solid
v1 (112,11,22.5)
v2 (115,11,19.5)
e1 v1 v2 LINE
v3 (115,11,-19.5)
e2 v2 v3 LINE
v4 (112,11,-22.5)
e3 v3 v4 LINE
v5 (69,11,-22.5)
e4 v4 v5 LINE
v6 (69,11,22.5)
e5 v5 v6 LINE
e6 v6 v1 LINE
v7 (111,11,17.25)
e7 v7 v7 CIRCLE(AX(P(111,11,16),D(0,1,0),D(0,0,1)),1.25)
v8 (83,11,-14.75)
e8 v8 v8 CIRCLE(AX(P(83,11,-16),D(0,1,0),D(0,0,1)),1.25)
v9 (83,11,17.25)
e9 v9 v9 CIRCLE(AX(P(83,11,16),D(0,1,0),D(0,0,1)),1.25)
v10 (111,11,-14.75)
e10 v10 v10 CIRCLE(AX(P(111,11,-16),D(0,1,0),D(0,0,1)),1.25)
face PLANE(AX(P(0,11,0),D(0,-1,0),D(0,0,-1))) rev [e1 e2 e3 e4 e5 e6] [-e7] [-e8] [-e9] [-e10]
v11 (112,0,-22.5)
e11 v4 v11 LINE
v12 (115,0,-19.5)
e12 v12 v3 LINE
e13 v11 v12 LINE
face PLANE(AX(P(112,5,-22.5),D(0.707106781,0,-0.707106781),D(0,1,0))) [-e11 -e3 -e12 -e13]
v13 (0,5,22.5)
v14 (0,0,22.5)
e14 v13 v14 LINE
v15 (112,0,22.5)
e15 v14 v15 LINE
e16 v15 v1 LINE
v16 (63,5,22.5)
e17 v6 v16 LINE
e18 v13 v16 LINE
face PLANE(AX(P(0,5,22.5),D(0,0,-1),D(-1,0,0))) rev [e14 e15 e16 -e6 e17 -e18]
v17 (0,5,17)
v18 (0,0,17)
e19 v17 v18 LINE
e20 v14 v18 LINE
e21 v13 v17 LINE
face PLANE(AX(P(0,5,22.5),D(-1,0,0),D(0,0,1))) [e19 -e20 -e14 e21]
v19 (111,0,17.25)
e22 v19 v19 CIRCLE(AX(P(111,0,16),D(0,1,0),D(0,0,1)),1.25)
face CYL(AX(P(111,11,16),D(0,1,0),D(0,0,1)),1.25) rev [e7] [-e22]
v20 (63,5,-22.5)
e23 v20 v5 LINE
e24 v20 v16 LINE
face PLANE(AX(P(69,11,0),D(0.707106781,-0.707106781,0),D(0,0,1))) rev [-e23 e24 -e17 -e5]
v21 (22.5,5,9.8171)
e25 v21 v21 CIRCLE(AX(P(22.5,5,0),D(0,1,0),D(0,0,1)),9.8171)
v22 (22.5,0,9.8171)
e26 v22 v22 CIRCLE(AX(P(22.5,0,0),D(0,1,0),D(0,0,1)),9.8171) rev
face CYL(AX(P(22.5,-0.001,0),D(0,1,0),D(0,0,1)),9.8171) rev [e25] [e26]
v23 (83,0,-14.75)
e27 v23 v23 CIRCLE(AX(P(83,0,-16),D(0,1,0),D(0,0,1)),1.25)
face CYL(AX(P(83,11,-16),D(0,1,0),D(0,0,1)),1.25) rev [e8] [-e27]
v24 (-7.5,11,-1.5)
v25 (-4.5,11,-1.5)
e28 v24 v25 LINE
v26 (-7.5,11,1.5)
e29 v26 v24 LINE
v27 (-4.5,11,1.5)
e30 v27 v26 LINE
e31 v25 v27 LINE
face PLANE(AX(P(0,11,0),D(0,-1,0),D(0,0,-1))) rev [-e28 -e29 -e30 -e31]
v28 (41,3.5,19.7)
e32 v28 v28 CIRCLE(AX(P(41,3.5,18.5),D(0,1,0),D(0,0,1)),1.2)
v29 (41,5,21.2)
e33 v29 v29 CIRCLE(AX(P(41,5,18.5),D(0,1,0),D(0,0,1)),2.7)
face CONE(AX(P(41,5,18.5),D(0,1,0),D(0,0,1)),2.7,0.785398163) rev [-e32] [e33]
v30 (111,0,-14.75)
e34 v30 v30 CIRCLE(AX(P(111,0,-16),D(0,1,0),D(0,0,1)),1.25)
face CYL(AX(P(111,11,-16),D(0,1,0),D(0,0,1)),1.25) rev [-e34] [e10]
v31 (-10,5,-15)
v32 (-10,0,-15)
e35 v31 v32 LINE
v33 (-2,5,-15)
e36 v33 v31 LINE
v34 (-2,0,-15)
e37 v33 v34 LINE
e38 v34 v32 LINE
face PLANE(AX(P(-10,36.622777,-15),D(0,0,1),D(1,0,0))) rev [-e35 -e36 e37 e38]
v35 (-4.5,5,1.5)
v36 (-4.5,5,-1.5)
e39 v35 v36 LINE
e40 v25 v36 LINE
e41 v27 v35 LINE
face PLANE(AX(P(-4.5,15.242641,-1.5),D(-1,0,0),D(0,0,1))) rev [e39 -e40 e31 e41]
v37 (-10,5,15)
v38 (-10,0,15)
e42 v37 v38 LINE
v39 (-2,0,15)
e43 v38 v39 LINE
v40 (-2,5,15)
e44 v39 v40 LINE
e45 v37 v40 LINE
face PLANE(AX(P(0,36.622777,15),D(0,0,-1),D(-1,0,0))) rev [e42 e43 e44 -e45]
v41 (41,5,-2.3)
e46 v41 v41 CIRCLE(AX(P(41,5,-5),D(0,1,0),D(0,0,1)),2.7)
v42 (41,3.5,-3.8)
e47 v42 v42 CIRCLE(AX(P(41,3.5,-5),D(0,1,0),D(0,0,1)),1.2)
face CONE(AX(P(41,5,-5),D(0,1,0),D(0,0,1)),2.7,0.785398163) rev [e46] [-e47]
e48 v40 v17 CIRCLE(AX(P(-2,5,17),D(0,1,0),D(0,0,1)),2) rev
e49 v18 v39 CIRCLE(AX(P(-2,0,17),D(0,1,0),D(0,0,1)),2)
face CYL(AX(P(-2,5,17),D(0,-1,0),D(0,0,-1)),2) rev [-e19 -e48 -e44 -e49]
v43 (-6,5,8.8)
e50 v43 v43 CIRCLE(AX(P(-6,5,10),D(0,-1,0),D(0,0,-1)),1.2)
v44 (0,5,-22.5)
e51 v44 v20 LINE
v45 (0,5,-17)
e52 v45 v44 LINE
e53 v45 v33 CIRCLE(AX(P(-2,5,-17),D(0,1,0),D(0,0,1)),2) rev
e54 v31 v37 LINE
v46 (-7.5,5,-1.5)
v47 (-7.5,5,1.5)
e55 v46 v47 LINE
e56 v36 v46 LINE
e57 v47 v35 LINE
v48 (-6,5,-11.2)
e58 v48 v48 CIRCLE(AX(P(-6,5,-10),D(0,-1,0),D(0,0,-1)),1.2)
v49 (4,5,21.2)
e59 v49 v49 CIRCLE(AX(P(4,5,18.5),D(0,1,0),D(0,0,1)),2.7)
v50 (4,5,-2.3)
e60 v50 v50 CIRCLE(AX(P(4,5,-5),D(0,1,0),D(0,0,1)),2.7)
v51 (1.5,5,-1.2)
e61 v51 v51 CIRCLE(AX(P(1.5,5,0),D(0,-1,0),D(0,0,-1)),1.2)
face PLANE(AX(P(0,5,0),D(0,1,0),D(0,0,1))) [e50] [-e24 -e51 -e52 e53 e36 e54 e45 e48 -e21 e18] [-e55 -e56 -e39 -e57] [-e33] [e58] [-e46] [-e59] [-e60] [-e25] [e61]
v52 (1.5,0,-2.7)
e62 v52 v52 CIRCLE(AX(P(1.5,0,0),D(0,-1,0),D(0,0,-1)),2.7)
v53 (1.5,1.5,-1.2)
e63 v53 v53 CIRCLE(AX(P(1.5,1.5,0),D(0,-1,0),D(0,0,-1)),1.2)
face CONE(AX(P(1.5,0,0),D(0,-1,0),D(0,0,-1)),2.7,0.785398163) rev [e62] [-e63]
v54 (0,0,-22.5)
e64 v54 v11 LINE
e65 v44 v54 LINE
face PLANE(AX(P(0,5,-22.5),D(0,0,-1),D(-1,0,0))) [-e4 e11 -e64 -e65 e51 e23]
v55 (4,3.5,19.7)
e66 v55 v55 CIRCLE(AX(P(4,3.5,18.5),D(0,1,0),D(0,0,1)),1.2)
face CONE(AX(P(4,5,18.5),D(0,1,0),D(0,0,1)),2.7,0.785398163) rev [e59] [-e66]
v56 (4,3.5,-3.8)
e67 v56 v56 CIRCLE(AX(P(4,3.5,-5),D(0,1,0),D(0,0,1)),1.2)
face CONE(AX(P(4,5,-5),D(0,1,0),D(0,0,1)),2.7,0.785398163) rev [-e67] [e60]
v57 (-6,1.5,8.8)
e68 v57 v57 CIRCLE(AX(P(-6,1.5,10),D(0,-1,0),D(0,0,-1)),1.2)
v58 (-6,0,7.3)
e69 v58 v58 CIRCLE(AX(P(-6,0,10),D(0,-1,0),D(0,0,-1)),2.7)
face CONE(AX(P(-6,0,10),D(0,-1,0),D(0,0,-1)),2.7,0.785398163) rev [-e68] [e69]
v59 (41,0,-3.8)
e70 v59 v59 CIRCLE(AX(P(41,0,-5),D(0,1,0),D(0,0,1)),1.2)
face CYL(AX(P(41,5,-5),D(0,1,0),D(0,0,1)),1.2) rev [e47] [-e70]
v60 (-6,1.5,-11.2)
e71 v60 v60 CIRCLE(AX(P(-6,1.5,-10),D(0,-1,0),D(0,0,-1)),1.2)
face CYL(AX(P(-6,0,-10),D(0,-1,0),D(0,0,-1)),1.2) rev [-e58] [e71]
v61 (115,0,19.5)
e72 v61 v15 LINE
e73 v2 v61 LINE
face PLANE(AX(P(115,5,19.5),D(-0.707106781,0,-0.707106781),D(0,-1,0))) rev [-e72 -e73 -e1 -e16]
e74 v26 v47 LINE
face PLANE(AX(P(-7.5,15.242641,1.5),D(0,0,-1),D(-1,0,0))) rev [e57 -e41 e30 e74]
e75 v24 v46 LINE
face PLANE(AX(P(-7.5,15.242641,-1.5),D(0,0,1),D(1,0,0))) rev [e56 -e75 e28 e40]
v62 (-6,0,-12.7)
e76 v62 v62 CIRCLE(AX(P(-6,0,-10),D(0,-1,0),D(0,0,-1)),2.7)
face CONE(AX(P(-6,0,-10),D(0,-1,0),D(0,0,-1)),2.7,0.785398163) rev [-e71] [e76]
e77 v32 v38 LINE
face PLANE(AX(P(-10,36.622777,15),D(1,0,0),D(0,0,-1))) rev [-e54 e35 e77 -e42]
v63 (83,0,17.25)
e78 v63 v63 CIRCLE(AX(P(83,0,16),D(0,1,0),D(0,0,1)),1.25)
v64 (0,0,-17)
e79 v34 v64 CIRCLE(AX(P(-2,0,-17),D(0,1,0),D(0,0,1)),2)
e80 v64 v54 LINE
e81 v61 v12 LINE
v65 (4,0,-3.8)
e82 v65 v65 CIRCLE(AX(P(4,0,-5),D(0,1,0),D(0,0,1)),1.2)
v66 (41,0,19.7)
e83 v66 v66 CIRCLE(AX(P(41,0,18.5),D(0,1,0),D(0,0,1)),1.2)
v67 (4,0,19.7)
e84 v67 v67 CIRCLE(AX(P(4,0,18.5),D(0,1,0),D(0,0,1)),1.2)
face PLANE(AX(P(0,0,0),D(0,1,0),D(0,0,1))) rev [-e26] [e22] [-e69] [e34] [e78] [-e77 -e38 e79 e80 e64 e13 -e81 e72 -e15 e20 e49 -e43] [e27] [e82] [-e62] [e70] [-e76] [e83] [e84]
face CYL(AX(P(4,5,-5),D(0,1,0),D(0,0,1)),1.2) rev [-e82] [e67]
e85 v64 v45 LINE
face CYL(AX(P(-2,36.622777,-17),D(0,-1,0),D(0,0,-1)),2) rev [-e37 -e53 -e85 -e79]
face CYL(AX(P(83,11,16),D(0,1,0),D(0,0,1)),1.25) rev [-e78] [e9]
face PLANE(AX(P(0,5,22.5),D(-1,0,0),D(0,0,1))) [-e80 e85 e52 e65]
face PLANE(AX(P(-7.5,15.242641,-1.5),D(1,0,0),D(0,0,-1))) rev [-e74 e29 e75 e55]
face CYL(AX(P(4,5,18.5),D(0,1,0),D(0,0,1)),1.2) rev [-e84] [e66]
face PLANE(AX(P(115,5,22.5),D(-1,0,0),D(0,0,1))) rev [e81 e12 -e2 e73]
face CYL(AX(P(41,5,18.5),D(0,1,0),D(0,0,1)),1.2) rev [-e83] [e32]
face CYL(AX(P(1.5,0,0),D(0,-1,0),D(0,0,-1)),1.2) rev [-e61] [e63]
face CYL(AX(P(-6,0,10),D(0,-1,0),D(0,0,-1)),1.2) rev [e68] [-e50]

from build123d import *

# Parameters (mm, degrees)
SKETCH1_W                                           = 115
SKETCH1_H                                           = 45
BOSS_EXTRUDE1_DEPTH                                 = 5
CUT_EXTRUDE1_REACH                                  = 119.287
SKETCH2_R                                           = 9.8171
CSK_FOR_M2_COUNTERSUNK_FLAT_HEAD_SCREW1_D           = 2.4
CSK_FOR_M2_COUNTERSUNK_FLAT_HEAD_SCREW1_CSINK_D     = 5.4
CSK_FOR_M2_COUNTERSUNK_FLAT_HEAD_SCREW1_CSINK_ANGLE = 90
SKETCH13_W                                          = 52
SKETCH13_H                                          = 45
BOSS_EXTRUDE4_DEPTH                                 = 6
CHAMFER2_SIZE                                       = 6
M3_TAPPED_HOLE1_D                                   = 2.5
CHAMFER1_SIZE                                       = 3
SKETCH14_W                                          = 10
SKETCH14_H                                          = 30
BOSS_EXTRUDE5_DEPTH                                 = 5
FILLET1_R                                           = 2
CSK_FOR_M2_COUNTERSUNK_FLAT_HEAD_SCREW2_D           = 2.4
CSK_FOR_M2_COUNTERSUNK_FLAT_HEAD_SCREW2_DEPTH       = 5
CSK_FOR_M2_COUNTERSUNK_FLAT_HEAD_SCREW2_CSINK_D     = 5.4
CSK_FOR_M2_COUNTERSUNK_FLAT_HEAD_SCREW2_CSINK_ANGLE = 90
CSK_FOR_M2_COUNTERSUNK_FLAT_HEAD_SCREW2_TIP         = 0.721032743
SKETCH17_W                                          = 3
SKETCH17_H                                          = 3
BOSS_EXTRUDE6_DEPTH                                 = 6


with BuildPart() as part:
    # Sketch1 → Boss-Extrude1 (new body)
    with BuildSketch(Plane(origin=(0, 0, 0), x_dir=(1, 0, 0), z_dir=(0, 1, 0))):
        with Locations((57.5, 0)):
            Rectangle(SKETCH1_W, SKETCH1_H)
    extrude(amount=BOSS_EXTRUDE1_DEPTH)

    # Sketch2 → Cut-Extrude1 (cut, up to next)
    with BuildSketch(Plane(origin=(0, 5, 0), x_dir=(1, 0, 0), z_dir=(0, 1, 0)), mode=Mode.PRIVATE) as cut_extrude1_sk1:
        with Locations(Location((22.5, 0, 0), (0, 0, 270))):
            Circle(SKETCH2_R)
    cut_extrude1_tool1 = extrude(cut_extrude1_sk1.sketch, amount=-CUT_EXTRUDE1_REACH, mode=Mode.PRIVATE) & part.part
    add(cut_extrude1_tool1.solids().sort_by_distance((22.5, 5, 0))[0], mode=Mode.SUBTRACT)

    # CSK for M2 Countersunk Flat Head Screw1 (through all)
    with Locations(Plane(origin=(0, 5, 0), x_dir=(1, 0, 0), z_dir=(0, 1, 0))):
        with Locations((4, -18.5), (41, -18.5), (41, 5), (4, 5)):
            CounterSinkHole(CSK_FOR_M2_COUNTERSUNK_FLAT_HEAD_SCREW1_D / 2, CSK_FOR_M2_COUNTERSUNK_FLAT_HEAD_SCREW1_CSINK_D / 2, counter_sink_angle=CSK_FOR_M2_COUNTERSUNK_FLAT_HEAD_SCREW1_CSINK_ANGLE)

    # Sketch13 → Boss-Extrude4 (add)
    with BuildSketch(Plane(origin=(0, 5, 0), x_dir=(1, 0, 0), z_dir=(0, 1, 0))):
        with Locations((89, 0)):
            Rectangle(SKETCH13_W, SKETCH13_H)
    extrude(amount=BOSS_EXTRUDE4_DEPTH)

    # Chamfer2
    chamfer2_edges = [part.edges().sort_by_distance(p)[0] for p in [
        (63, 11, 0),
    ]]
    chamfer(chamfer2_edges, length=CHAMFER2_SIZE - 0.0001)  # a hair under: the kernel refuses the full size

    # M3 Tapped Hole1 (through all)
    with Locations(Plane(origin=(0, 11, 0), x_dir=(1, 0, 0), z_dir=(0, 1, 0))):
        with Locations((83, 16), (111, 16), (83, -16), (111, -16)):
            Hole(M3_TAPPED_HOLE1_D / 2)

    # Chamfer1
    chamfer1_edges = [part.edges().sort_by_distance(p)[0] for p in [
        (115, 5.5, -22.5),
        (115, 5.5, 22.5),
    ]]
    chamfer(chamfer1_edges, length=CHAMFER1_SIZE)

    # Sketch14 → Boss-Extrude5 (add)
    with BuildSketch(Plane(origin=(0, 0, 0), x_dir=(1, 0, 0), z_dir=(0, 1, 0))):
        with Locations((-5, 0)):
            Rectangle(SKETCH14_W, SKETCH14_H)
    extrude(amount=BOSS_EXTRUDE5_DEPTH)

    # Fillet1
    fillet1_edges = [part.edges().sort_by_distance(p)[0] for p in [
        (0, 2.5, -15),
        (0, 2.5, 15),
    ]]
    fillet(fillet1_edges, radius=FILLET1_R)

    # CSK for M2 Countersunk Flat Head Screw2
    with Locations(Plane(origin=(0, 0, 0), x_dir=(-1, 0, 0), z_dir=(0, -1, 0))):
        with Locations((-1.5, 0), (6, -10), (6, 10)):
            CounterSinkHole(CSK_FOR_M2_COUNTERSUNK_FLAT_HEAD_SCREW2_D / 2, CSK_FOR_M2_COUNTERSUNK_FLAT_HEAD_SCREW2_CSINK_D / 2, depth=CSK_FOR_M2_COUNTERSUNK_FLAT_HEAD_SCREW2_DEPTH, counter_sink_angle=CSK_FOR_M2_COUNTERSUNK_FLAT_HEAD_SCREW2_CSINK_ANGLE)
            with Locations((0, 0, -(CSK_FOR_M2_COUNTERSUNK_FLAT_HEAD_SCREW2_DEPTH + CSK_FOR_M2_COUNTERSUNK_FLAT_HEAD_SCREW2_TIP / 2))):  # 118° drill point
                Cone(0, CSK_FOR_M2_COUNTERSUNK_FLAT_HEAD_SCREW2_D / 2, CSK_FOR_M2_COUNTERSUNK_FLAT_HEAD_SCREW2_TIP, mode=Mode.SUBTRACT)

    # Sketch17 → Boss-Extrude6 (add)
    with BuildSketch(Plane(origin=(0, 5, 0), x_dir=(1, 0, 0), z_dir=(0, 1, 0))):
        with Locations((-6, 0)):
            Rectangle(SKETCH17_W, SKETCH17_H)
    extrude(amount=BOSS_EXTRUDE6_DEPTH)


solid = part.part
